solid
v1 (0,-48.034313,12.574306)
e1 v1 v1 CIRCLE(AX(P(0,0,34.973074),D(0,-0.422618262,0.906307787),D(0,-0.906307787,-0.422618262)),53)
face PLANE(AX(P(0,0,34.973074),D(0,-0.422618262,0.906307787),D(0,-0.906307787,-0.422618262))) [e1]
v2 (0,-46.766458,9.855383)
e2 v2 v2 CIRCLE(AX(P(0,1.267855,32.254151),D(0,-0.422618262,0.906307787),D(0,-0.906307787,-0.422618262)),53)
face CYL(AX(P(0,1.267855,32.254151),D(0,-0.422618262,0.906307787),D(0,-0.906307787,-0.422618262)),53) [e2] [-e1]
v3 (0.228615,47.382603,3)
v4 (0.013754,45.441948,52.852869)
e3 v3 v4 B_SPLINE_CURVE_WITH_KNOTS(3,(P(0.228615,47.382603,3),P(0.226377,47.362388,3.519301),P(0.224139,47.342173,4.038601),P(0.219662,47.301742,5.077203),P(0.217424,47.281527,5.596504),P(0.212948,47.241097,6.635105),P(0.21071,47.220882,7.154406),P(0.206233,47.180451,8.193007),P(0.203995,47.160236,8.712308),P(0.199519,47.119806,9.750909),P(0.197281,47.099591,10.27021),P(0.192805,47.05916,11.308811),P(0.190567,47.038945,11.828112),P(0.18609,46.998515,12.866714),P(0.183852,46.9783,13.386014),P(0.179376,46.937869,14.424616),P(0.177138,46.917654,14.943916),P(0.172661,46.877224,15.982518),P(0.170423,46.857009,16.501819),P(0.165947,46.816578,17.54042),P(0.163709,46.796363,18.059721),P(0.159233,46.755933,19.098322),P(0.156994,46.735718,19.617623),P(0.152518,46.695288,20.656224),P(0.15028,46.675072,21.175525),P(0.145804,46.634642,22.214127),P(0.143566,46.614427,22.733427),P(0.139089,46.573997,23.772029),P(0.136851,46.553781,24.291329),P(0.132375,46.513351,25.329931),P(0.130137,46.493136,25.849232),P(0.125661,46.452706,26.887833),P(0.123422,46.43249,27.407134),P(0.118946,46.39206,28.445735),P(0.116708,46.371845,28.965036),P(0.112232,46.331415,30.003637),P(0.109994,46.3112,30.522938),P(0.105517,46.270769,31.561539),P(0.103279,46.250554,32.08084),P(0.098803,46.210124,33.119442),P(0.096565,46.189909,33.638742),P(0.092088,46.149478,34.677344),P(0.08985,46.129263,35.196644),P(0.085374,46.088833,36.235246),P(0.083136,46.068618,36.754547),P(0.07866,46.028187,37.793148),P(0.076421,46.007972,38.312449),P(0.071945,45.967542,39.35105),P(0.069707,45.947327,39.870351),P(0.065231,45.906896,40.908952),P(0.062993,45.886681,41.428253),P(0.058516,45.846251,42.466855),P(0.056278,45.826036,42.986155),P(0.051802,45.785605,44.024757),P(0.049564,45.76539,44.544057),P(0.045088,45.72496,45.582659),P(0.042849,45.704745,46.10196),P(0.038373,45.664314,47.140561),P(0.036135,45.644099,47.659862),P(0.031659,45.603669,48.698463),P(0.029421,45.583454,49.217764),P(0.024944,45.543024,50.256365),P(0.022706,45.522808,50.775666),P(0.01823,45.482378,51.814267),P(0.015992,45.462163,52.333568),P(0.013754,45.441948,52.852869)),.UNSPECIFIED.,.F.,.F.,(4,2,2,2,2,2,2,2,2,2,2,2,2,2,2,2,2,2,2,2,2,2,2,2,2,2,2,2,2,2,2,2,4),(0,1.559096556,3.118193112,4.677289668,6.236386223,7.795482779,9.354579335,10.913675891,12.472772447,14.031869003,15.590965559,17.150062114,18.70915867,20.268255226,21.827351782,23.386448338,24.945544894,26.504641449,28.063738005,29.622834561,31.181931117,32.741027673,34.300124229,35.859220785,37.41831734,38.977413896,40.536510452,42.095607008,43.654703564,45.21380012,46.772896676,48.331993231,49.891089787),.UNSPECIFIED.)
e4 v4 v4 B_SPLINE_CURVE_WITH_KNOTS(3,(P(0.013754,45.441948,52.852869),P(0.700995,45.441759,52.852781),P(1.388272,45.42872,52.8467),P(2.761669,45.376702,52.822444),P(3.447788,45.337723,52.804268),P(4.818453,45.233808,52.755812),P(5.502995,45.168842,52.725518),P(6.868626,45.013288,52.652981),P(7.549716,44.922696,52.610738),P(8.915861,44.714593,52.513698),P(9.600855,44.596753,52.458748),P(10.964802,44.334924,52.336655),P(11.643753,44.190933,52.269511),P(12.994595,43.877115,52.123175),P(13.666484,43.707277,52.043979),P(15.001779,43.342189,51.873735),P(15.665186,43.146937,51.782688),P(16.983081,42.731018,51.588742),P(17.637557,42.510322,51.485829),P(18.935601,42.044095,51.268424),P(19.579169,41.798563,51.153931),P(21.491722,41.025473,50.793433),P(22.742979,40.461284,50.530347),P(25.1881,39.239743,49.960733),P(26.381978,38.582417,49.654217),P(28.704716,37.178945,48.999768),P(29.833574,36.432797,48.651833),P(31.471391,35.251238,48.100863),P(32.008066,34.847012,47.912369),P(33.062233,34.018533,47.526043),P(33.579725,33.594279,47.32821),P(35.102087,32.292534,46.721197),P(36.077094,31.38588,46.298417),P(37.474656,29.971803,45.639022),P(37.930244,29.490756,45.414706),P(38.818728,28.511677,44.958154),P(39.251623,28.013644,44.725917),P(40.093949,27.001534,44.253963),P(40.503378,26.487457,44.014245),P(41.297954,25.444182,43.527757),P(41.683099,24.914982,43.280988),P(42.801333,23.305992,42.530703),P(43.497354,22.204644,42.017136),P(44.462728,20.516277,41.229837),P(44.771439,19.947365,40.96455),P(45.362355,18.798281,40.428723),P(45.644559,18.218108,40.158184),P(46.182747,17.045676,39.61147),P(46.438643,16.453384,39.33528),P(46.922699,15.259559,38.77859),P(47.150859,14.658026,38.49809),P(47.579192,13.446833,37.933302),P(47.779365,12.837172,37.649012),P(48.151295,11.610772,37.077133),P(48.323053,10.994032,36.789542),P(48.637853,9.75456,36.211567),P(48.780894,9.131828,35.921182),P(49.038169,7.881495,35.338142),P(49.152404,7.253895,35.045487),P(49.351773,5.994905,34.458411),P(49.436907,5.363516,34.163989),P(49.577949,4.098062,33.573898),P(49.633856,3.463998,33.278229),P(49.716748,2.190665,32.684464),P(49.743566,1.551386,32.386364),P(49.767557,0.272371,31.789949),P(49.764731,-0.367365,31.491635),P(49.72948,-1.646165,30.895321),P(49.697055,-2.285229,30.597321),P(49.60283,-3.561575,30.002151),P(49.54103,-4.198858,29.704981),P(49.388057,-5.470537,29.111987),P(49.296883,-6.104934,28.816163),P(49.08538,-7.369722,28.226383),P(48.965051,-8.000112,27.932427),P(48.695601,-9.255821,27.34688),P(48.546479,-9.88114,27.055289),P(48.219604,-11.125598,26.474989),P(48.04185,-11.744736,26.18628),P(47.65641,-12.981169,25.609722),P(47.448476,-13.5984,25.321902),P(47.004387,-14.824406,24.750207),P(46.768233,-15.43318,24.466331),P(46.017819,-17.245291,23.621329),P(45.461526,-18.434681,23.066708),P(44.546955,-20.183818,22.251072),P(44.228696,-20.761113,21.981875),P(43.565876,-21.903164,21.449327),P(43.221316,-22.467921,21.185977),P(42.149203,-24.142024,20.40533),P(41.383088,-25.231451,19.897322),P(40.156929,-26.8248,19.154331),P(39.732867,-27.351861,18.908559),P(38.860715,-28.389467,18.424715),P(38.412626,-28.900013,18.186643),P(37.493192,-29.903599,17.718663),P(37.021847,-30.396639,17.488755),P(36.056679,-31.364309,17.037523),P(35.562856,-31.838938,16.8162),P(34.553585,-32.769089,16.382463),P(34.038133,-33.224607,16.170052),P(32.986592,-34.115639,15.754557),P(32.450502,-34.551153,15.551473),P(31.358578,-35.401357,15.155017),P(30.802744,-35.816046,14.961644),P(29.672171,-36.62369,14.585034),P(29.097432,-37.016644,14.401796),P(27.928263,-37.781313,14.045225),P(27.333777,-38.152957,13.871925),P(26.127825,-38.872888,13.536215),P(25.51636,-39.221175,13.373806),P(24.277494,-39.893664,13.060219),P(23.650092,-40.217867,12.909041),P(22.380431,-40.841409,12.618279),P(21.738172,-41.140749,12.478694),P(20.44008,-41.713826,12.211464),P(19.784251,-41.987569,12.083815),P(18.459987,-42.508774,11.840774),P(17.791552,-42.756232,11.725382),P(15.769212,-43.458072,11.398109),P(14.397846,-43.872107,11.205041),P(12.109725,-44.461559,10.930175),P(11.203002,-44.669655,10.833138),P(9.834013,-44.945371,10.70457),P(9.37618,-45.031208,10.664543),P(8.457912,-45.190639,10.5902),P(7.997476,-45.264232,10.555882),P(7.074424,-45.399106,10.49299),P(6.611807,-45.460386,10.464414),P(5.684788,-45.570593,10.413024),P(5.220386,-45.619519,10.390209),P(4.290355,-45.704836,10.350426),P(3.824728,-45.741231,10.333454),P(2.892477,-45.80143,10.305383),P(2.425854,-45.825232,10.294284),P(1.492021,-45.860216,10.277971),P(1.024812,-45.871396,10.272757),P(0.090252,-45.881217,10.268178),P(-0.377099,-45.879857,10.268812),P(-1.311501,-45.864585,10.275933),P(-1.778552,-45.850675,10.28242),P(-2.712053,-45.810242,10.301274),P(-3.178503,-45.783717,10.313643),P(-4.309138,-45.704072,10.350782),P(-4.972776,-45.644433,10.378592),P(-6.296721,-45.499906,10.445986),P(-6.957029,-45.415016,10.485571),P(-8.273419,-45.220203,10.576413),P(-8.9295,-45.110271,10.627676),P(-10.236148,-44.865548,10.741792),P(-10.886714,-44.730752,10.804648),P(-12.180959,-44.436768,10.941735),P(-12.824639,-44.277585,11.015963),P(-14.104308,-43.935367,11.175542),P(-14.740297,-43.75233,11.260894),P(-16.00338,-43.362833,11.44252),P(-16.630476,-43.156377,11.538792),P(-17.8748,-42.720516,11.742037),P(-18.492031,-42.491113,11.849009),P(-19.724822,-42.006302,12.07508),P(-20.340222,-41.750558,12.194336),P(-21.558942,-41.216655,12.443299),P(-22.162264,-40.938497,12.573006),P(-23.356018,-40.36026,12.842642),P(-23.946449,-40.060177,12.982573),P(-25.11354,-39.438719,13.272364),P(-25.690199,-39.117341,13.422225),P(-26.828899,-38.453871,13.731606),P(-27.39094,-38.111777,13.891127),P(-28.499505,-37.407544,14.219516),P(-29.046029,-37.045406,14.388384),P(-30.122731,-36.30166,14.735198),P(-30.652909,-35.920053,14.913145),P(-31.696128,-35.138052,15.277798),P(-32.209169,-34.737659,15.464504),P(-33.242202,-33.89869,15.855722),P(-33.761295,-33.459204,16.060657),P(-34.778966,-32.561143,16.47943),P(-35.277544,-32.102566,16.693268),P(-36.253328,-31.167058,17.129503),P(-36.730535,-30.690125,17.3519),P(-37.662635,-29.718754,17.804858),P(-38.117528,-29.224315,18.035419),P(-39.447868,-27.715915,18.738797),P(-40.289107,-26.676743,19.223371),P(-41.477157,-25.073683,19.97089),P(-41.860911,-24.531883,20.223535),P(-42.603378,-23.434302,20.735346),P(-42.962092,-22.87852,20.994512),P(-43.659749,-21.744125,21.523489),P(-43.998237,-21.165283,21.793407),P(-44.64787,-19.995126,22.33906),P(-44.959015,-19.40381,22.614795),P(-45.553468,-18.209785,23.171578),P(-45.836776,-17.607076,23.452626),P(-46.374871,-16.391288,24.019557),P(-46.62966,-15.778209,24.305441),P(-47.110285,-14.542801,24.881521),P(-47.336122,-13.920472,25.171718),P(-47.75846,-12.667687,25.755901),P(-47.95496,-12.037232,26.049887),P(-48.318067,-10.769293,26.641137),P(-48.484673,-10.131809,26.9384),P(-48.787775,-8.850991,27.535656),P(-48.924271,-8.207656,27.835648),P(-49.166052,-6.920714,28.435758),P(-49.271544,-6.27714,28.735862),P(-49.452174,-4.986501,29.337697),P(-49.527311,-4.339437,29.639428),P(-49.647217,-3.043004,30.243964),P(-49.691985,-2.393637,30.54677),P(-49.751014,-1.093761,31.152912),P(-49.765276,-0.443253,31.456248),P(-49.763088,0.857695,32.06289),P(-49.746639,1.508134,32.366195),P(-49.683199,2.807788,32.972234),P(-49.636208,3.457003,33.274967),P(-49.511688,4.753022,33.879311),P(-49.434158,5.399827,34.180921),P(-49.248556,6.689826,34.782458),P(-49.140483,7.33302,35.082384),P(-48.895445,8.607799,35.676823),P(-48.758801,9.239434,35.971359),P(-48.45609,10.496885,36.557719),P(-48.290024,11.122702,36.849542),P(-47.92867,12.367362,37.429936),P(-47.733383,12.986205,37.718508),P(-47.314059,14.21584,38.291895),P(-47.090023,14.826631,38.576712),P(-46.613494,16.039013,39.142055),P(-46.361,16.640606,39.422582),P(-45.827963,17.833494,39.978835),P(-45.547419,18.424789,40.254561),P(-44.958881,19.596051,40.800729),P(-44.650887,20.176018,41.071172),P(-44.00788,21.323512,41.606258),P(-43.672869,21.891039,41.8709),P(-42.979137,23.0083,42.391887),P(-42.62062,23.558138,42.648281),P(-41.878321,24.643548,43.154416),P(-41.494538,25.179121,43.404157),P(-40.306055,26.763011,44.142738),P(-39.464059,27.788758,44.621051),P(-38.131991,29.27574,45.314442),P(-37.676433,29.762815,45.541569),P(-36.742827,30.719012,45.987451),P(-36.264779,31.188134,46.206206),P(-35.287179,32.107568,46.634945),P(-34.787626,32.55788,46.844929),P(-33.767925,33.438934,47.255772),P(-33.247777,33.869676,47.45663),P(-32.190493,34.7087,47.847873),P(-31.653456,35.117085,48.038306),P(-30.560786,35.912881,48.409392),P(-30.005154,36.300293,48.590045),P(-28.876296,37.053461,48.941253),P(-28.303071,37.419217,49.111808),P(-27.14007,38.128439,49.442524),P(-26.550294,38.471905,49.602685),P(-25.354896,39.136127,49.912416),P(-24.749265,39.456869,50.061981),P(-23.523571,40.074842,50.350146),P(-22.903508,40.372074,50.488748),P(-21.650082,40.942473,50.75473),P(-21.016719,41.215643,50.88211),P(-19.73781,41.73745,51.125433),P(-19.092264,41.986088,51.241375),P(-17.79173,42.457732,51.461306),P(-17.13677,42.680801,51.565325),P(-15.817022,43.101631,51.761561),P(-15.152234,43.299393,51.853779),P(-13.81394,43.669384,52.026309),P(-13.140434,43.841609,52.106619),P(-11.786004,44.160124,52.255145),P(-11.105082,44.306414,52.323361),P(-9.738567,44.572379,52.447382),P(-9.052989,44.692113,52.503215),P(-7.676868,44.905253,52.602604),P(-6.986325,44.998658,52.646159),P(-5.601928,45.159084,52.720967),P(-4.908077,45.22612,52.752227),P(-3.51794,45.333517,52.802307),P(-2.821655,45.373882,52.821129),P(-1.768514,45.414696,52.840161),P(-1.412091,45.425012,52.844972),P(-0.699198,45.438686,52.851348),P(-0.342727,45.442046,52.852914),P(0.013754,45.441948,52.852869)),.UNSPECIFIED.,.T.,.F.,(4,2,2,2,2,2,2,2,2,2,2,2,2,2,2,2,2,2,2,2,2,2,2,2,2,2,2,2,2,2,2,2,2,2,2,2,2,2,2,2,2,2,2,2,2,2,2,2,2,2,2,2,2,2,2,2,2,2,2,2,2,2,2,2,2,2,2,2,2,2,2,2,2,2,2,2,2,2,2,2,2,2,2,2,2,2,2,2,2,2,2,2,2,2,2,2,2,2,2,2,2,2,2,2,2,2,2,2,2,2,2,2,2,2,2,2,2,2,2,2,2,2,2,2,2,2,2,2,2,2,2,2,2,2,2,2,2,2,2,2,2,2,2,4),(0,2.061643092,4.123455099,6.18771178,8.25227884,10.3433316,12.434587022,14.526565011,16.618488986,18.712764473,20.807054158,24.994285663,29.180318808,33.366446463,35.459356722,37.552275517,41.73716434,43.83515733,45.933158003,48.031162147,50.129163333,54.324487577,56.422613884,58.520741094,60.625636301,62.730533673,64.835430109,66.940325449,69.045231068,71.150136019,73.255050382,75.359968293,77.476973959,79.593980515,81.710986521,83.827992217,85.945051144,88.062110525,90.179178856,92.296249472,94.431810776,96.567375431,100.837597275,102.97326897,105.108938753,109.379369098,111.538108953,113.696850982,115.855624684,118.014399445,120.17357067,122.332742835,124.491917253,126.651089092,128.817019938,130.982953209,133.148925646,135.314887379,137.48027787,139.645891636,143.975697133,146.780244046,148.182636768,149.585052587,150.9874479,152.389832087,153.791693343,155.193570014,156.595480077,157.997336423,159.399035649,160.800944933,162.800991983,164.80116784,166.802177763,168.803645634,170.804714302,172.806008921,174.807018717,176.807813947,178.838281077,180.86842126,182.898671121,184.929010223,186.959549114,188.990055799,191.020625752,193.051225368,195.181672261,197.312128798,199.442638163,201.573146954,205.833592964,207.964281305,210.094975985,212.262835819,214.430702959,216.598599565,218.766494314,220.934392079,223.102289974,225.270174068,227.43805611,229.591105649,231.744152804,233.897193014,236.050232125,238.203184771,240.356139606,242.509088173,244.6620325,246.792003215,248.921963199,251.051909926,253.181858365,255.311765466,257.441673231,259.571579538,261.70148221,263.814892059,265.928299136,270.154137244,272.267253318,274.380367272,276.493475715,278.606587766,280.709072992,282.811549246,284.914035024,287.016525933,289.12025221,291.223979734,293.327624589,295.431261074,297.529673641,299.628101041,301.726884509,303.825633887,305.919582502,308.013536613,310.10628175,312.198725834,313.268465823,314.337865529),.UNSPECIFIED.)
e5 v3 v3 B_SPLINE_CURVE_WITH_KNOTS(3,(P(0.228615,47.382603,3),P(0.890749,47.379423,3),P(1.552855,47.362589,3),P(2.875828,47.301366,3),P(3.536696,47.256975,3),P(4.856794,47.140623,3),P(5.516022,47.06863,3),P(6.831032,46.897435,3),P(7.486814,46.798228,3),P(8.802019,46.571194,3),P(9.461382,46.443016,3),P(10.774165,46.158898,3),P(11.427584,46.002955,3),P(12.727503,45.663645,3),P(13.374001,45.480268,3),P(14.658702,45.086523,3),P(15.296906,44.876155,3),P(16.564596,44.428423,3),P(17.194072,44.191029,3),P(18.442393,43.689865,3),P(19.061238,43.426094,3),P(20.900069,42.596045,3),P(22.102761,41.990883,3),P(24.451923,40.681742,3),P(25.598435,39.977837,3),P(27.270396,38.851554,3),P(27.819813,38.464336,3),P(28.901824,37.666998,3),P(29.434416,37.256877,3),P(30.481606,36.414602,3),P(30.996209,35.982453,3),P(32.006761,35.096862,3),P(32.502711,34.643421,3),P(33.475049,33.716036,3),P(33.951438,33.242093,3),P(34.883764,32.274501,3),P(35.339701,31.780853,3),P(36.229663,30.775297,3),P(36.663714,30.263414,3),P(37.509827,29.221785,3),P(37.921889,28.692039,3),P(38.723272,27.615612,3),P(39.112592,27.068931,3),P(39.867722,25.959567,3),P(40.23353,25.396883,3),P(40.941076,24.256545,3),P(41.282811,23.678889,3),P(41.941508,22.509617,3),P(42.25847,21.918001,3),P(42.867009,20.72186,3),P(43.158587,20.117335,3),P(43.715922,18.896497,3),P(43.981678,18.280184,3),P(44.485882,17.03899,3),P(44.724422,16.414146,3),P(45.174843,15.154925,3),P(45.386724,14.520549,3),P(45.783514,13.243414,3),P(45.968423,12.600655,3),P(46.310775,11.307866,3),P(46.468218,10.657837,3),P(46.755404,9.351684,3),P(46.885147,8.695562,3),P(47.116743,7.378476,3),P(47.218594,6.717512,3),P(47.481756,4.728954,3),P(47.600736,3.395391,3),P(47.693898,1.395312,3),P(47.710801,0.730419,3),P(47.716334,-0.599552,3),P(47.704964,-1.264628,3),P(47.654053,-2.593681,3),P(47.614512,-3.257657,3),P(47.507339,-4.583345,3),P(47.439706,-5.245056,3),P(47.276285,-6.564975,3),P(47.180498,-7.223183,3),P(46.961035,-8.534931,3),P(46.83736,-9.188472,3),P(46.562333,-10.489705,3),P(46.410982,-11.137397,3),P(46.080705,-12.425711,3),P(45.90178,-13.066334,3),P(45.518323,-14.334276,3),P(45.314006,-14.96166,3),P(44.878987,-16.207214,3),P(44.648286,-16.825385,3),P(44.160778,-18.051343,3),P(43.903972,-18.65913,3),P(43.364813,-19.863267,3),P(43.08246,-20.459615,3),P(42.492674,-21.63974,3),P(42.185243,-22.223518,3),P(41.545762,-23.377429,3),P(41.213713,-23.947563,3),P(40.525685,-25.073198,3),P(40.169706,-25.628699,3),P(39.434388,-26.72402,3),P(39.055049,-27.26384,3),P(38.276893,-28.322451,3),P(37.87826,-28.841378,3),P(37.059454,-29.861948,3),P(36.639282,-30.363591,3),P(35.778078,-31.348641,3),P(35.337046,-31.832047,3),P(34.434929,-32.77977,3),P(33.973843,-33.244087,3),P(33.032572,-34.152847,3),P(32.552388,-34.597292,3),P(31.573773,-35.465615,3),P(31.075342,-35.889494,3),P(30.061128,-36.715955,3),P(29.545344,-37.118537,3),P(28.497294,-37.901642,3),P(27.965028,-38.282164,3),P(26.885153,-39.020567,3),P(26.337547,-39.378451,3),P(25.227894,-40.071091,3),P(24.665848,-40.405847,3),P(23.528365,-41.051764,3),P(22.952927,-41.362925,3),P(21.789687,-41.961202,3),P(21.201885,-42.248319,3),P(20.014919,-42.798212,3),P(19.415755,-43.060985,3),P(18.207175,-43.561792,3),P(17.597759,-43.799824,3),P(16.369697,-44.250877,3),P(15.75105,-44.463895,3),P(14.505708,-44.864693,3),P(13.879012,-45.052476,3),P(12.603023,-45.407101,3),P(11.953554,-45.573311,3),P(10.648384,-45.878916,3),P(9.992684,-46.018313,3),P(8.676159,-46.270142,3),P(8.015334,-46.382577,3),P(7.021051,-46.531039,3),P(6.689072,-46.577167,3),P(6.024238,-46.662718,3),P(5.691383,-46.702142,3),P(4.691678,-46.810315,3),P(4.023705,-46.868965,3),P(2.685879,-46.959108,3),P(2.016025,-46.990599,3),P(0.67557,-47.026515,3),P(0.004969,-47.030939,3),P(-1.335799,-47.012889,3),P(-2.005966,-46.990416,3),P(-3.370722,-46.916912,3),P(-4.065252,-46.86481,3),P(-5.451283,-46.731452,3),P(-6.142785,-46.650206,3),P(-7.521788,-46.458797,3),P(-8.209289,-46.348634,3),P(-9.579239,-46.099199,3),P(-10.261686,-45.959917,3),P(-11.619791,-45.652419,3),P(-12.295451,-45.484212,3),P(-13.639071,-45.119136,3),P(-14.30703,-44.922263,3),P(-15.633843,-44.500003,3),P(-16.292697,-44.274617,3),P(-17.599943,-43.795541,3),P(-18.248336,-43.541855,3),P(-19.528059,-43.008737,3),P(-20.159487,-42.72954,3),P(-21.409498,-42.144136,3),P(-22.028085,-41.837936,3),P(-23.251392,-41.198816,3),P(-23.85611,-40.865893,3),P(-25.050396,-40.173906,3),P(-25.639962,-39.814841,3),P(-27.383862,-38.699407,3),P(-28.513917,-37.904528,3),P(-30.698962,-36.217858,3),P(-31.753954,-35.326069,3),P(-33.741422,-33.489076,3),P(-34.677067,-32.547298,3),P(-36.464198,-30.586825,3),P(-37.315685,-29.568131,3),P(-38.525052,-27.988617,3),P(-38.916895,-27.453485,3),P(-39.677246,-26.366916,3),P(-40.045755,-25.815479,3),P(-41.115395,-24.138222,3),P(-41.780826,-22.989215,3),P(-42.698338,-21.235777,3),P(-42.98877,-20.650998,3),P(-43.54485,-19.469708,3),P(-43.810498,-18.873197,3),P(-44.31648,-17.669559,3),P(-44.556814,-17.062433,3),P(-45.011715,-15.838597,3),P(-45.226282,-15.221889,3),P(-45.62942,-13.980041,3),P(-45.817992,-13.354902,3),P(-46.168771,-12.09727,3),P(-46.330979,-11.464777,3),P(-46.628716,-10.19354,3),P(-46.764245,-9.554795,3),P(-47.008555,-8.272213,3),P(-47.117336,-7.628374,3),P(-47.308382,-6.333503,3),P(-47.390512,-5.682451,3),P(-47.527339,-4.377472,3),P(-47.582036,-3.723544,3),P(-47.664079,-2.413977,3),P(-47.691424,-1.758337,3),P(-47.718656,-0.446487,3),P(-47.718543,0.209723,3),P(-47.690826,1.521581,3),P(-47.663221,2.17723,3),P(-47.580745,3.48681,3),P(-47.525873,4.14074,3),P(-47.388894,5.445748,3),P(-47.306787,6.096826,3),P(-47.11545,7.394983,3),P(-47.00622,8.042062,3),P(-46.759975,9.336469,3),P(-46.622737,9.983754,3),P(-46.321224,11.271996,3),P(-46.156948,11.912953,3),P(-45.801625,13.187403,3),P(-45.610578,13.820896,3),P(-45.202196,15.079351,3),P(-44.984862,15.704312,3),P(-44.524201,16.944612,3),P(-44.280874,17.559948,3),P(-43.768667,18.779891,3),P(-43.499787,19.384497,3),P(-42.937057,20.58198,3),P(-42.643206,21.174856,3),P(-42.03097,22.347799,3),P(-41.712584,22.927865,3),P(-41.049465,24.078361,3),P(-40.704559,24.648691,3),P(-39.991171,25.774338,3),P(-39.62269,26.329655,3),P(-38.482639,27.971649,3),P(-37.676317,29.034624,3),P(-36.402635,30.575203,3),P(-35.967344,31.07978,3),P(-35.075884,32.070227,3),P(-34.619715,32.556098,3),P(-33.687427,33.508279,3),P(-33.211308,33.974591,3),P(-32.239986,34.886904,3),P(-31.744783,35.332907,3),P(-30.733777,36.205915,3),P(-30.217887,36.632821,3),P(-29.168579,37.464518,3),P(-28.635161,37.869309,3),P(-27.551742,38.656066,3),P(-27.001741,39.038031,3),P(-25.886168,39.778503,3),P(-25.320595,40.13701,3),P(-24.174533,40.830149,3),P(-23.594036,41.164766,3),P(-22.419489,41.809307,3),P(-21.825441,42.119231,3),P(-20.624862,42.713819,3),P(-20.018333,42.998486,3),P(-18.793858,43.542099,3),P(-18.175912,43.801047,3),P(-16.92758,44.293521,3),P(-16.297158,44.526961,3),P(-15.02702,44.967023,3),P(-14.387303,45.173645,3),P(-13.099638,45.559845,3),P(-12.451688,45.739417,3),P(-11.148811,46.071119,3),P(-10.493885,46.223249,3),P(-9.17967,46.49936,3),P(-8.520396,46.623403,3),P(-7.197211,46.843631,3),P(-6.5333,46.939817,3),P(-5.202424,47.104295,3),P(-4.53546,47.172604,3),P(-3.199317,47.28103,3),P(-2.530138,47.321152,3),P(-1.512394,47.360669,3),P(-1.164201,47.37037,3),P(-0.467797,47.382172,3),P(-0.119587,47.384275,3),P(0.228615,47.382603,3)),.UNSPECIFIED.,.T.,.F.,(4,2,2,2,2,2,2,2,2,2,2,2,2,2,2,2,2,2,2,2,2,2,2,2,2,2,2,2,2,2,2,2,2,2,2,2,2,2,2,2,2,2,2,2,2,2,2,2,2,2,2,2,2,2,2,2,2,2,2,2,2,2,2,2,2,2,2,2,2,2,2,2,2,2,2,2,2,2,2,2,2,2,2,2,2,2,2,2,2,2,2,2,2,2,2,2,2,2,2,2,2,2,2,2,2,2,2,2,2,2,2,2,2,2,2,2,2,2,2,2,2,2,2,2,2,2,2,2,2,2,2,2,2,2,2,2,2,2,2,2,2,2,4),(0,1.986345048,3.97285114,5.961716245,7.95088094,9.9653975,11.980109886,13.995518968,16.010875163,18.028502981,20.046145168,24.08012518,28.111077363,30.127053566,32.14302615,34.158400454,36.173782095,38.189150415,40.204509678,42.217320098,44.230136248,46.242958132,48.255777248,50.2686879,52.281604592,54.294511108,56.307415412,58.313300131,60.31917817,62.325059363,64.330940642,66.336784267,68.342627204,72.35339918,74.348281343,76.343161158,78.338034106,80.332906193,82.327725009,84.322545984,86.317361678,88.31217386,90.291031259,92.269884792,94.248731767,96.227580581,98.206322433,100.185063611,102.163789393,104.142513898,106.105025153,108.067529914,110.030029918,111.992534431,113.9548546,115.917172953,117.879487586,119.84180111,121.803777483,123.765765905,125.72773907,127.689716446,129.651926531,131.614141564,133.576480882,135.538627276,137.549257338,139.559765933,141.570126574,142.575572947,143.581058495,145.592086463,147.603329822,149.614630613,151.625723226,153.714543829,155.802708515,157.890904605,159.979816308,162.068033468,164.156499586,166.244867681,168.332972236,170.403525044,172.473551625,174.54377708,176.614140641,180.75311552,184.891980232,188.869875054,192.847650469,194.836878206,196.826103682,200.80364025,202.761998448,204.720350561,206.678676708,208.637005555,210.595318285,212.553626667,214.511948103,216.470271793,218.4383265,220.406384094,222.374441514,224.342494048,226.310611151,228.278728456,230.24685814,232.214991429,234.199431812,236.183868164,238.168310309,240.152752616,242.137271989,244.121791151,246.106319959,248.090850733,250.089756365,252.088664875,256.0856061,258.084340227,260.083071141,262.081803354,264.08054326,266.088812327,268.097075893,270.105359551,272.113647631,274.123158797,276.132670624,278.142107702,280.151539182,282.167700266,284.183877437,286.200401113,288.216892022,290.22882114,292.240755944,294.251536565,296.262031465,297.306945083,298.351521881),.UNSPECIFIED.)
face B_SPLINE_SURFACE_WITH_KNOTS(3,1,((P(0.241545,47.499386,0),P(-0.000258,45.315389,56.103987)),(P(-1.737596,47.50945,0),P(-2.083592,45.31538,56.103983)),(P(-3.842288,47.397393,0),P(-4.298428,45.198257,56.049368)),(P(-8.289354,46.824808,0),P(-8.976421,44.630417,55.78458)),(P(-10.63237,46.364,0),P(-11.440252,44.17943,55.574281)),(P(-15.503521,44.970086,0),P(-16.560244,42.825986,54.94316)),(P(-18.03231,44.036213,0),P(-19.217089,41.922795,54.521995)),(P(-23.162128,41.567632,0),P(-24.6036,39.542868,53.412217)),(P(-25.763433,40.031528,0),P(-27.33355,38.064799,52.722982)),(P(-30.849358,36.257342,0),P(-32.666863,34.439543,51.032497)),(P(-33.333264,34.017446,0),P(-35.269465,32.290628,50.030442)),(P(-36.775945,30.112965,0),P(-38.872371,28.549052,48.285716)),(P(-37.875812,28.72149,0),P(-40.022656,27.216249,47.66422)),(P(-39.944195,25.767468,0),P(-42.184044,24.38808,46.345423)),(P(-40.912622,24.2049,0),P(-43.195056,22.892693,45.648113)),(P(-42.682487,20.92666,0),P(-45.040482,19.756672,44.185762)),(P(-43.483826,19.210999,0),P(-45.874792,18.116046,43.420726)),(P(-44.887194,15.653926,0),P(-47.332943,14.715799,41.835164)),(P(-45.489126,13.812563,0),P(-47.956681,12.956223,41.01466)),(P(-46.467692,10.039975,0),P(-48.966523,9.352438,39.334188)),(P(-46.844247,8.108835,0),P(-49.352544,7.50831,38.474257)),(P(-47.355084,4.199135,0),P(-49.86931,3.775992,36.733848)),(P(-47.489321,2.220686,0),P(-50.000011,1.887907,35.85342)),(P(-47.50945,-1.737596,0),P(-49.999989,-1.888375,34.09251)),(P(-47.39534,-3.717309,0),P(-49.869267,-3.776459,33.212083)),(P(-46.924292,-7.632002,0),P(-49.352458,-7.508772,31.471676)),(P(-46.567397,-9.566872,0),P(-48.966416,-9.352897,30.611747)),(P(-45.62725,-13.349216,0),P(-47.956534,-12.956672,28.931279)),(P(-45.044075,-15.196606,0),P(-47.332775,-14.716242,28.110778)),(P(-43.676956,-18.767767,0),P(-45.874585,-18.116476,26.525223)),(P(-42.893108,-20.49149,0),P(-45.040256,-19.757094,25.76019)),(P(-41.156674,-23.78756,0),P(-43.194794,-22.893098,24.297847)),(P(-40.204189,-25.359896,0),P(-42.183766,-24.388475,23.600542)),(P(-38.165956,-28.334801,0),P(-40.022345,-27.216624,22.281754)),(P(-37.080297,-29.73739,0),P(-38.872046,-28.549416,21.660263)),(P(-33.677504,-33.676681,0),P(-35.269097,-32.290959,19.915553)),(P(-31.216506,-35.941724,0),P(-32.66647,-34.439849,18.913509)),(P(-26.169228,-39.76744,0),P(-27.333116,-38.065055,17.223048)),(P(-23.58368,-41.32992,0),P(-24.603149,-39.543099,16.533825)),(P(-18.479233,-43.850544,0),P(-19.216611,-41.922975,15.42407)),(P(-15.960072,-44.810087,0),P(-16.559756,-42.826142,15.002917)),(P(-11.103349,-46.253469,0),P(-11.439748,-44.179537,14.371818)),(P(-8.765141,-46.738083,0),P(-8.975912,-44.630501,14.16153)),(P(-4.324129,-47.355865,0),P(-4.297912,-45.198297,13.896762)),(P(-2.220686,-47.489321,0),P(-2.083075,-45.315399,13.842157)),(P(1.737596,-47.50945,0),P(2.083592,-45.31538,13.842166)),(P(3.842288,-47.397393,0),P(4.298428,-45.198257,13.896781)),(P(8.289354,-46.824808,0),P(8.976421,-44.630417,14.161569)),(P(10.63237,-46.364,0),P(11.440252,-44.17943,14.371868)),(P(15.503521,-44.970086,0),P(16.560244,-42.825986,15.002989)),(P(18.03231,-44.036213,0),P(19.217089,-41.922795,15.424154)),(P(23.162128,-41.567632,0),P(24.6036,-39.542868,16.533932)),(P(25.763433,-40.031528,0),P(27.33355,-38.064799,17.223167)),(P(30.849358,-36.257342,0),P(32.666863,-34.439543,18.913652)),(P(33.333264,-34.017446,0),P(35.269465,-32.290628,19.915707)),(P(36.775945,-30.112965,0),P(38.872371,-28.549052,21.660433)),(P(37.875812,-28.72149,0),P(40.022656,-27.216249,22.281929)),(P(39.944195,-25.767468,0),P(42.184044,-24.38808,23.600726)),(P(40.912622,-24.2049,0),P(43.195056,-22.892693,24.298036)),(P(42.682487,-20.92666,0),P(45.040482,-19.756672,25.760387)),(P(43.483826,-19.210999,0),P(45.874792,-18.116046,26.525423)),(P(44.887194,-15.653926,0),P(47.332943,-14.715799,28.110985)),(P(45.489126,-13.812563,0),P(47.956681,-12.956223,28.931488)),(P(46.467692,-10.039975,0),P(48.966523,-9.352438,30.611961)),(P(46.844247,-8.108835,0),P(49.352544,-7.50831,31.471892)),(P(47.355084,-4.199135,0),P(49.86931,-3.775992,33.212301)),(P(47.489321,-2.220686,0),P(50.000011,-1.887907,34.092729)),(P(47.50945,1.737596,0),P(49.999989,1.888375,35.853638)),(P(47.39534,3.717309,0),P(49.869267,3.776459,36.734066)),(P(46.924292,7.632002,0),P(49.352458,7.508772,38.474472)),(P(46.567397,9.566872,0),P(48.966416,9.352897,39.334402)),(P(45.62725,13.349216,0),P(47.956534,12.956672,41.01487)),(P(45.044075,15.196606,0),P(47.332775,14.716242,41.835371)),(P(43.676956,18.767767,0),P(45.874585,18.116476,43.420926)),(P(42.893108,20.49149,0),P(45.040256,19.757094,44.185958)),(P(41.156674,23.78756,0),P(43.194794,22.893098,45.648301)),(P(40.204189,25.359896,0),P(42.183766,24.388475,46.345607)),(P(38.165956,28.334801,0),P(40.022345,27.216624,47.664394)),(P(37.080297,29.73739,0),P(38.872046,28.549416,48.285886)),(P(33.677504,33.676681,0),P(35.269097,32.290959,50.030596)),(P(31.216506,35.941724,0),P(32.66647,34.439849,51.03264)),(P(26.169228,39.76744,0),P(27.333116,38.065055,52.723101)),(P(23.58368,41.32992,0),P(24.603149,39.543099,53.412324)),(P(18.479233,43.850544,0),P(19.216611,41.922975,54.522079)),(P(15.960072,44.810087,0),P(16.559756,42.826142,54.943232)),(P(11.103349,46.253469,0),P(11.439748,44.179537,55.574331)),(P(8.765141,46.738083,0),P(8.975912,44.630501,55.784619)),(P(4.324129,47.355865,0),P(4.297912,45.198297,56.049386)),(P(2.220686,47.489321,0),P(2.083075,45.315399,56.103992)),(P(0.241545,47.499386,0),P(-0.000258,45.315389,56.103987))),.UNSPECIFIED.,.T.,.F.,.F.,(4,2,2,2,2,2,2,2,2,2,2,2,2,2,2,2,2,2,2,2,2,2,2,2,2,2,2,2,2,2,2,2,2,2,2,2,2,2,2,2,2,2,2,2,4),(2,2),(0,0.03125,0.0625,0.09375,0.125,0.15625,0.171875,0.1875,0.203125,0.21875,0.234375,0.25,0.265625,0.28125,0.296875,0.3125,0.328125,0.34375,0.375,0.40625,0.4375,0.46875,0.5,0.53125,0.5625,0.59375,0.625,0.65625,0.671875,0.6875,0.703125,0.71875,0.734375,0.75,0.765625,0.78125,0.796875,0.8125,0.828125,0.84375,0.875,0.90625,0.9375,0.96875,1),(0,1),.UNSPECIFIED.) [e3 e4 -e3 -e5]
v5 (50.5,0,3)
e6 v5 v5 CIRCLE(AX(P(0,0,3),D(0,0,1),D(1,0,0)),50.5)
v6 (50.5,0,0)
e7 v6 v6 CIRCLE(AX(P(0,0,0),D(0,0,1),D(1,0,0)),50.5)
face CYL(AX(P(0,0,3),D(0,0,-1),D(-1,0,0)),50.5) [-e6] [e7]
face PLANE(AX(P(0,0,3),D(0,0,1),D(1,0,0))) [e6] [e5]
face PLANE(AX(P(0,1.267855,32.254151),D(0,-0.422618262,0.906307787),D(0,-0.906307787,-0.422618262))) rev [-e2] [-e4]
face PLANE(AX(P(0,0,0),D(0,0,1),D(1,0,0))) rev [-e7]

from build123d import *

# Parameters (mm, degrees)
SKETCH3_5_R         = 53
BOSS_EXTRUDE1_DEPTH = 3
SKETCH1_4_R         = 50.5
BOSS_EXTRUDE2_DEPTH = 3


with BuildPart() as part:
    # Loft1: read off the stored shape, not the designer's step
    # Loft1: loft between two sections, ruled curve by curve
    loft1_from = [
        Edge.make_bspline([(0.241544596, 47.499385851, 0), (-1.737596481, 47.509450209, 0), (-3.842288399, 47.39739319, 0), (-8.289353956, 46.8248083, 0), (-10.632369605, 46.363999982, 0), (-15.503520848, 44.970085825, 0), (-18.032309665, 44.036212824, 0), (-23.162128099, 41.567632284, 0), (-25.763433471, 40.031528494, 0), (-30.849358196, 36.257342383, 0), (-33.333264415, 34.017445551, 0), (-36.775944803, 30.112965039, 0), (-37.87581218, 28.721489593, 0), (-39.944194911, 25.767467971, 0), (-40.912622225, 24.204899544, 0), (-42.682487304, 20.926659955, 0), (-43.4838255, 19.210998711, 0), (-44.887193549, 15.653926246, 0), (-45.489126325, 13.81256268, 0), (-46.467691985, 10.039975263, 0), (-46.844246907, 8.108835207, 0), (-47.355083559, 4.19913537, 0), (-47.489321493, 2.220685673, 0), (-47.509450209, -1.737596481, 0), (-47.395340382, -3.71730908, 0), (-46.924292451, -7.632002012, 0), (-46.56739702, -9.56687182, 0), (-45.627249815, -13.349216305, 0), (-45.044075144, -15.196606398, 0), (-43.676955696, -18.767767387, 0), (-42.893107505, -20.491489645, 0), (-41.156674204, -23.787559516, 0), (-40.204188557, -25.359896199, 0), (-38.165955692, -28.334800844, 0), (-37.080296735, -29.737390161, 0), (-33.677503614, -33.676681379, 0), (-31.216505982, -35.941724111, 0), (-26.169228392, -39.767439736, 0), (-23.583679985, -41.329919793, 0), (-18.47923273, -43.850543776, 0), (-15.96007234, -44.810086685, 0), (-11.103349361, -46.253469175, 0), (-8.765141384, -46.738082523, 0), (-4.324129102, -47.3558652, 0), (-2.220685673, -47.489321493, 0), (1.737596481, -47.509450209, 0), (3.842288399, -47.39739319, 0), (8.289353956, -46.8248083, 0), (10.632369605, -46.363999982, 0), (15.503520848, -44.970085825, 0), (18.032309665, -44.036212824, 0), (23.162128099, -41.567632284, 0), (25.763433471, -40.031528494, 0), (30.849358196, -36.257342383, 0), (33.333264415, -34.017445551, 0), (36.775944803, -30.112965039, 0), (37.87581218, -28.721489593, 0), (39.944194911, -25.767467971, 0), (40.912622225, -24.204899544, 0), (42.682487304, -20.926659955, 0), (43.4838255, -19.210998711, 0), (44.887193549, -15.653926246, 0), (45.489126325, -13.81256268, 0), (46.467691985, -10.039975263, 0), (46.844246907, -8.108835207, 0), (47.355083559, -4.19913537, 0), (47.489321493, -2.220685673, 0), (47.509450209, 1.737596481, 0), (47.395340382, 3.71730908, 0), (46.924292451, 7.632002012, 0), (46.56739702, 9.56687182, 0), (45.627249815, 13.349216305, 0), (45.044075144, 15.196606398, 0), (43.676955696, 18.767767387, 0), (42.893107505, 20.491489645, 0), (41.156674204, 23.787559516, 0), (40.204188557, 25.359896199, 0), (38.165955692, 28.334800844, 0), (37.080296735, 29.737390161, 0), (33.677503614, 33.676681379, 0), (31.216505982, 35.941724111, 0), (26.169228392, 39.767439736, 0), (23.583679985, 41.329919793, 0), (18.47923273, 43.850543776, 0), (15.96007234, 44.810086685, 0), (11.103349361, 46.253469175, 0), (8.765141384, 46.738082523, 0), (4.324129102, 47.3558652, 0), (2.220685673, 47.489321493, 0), (0.241544596, 47.499385851, 0)], [0, 0, 0, 0, 0.03125, 0.03125, 0.0625, 0.0625, 0.09375, 0.09375, 0.125, 0.125, 0.15625, 0.15625, 0.171875, 0.171875, 0.1875, 0.1875, 0.203125, 0.203125, 0.21875, 0.21875, 0.234375, 0.234375, 0.25, 0.25, 0.265625, 0.265625, 0.28125, 0.28125, 0.296875, 0.296875, 0.3125, 0.3125, 0.328125, 0.328125, 0.34375, 0.34375, 0.375, 0.375, 0.40625, 0.40625, 0.4375, 0.4375, 0.46875, 0.46875, 0.5, 0.5, 0.53125, 0.53125, 0.5625, 0.5625, 0.59375, 0.59375, 0.625, 0.625, 0.65625, 0.65625, 0.671875, 0.671875, 0.6875, 0.6875, 0.703125, 0.703125, 0.71875, 0.71875, 0.734375, 0.734375, 0.75, 0.75, 0.765625, 0.765625, 0.78125, 0.78125, 0.796875, 0.796875, 0.8125, 0.8125, 0.828125, 0.828125, 0.84375, 0.84375, 0.875, 0.875, 0.90625, 0.90625, 0.9375, 0.9375, 0.96875, 0.96875, 1, 1, 1, 1], 3),
    ]
    loft1_to = [
        Edge.make_bspline([(-0.000258413, 45.315389351, 56.103987448), (-2.083591746, 45.315379593, 56.103982898), (-4.298427792, 45.198256849, 56.049367665), (-8.976420743, 44.630417387, 55.784579776), (-11.440251935, 44.179430006, 55.574280906), (-16.560244217, 42.825986395, 54.943159786), (-19.217088791, 41.922795124, 54.521994779), (-24.60360049, 39.542868117, 53.41221659), (-27.3335504, 38.064799025, 52.722981653), (-32.66686306, 34.439542895, 51.032496957), (-35.26946543, 32.290628285, 50.030441618), (-38.872371472, 28.54905177, 48.285715835), (-40.022655762, 27.216248807, 47.664219607), (-42.184044209, 24.388079988, 46.345422828), (-43.195055576, 22.892693332, 45.648112578), (-45.040481753, 19.756671584, 44.185761621), (-45.874791809, 18.116046437, 43.420725551), (-47.332942587, 14.715799072, 41.835164165), (-47.956681379, 12.956222787, 41.014660268), (-48.966522761, 9.35243798, 39.334187814), (-49.352543738, 7.508309779, 38.474256711), (-49.869310496, 3.775991683, 36.7338482), (-50.000010767, 1.887907021, 35.853419864), (-49.999989232, -1.888375425, 34.09251044), (-49.869267427, -3.776458861, 33.212082674), (-49.352458103, -7.508772116, 31.47167642), (-48.966416093, -9.352896701, 30.611747004), (-47.95653361, -12.956672047, 28.931278962), (-47.332774749, -14.716242489, 28.11077779), (-45.874585192, -18.116476194, 26.525222773), (-45.040256424, -19.757093525, 25.760190348), (-43.194794481, -22.893097985, 24.297847452), (-42.183766059, -24.388475169, 23.60054162), (-40.022345356, -27.21662374, 22.281754282), (-38.872045866, -28.549415928, 21.660263079), (-35.269097151, -32.29095869, 19.915553035), (-32.666470272, -34.439848919, 18.913509065), (-27.333116266, -38.065055085, 17.223047667), (-24.603149499, -39.543098603, 16.533824656), (-19.216610657, -41.922975149, 15.424069997), (-16.559755782, -42.82614153, 15.002916597), (-11.439748065, -44.179537177, 14.371817842), (-8.975911729, -44.630501476, 14.161529736), (-4.297912302, -45.198297114, 13.896762282), (-2.08307492, -45.31539911, 13.842156724), (2.083591746, -45.315379593, 13.842165825), (4.298427792, -45.198256849, 13.896781058), (8.976420743, -44.630417387, 14.161568947), (11.440251935, -44.179430006, 14.371867817), (16.560244217, -42.825986395, 15.002988937), (19.217088791, -41.922795124, 15.424153944), (24.60360049, -39.542868117, 16.533932133), (27.3335504, -38.064799025, 17.22316707), (32.66686306, -34.439542895, 18.913651766), (35.26946543, -32.290628285, 19.915707106), (38.872371472, -28.54905177, 21.660432888), (40.022655762, -27.216248807, 22.281929117), (42.184044209, -24.388079988, 23.600725896), (43.195055576, -22.892693332, 24.298036145), (45.040481753, -19.756671584, 25.760387102), (45.874791809, -18.116046437, 26.525423172), (47.332942587, -14.715799072, 28.110984559), (47.956681379, -12.956222787, 28.931488455), (48.966522761, -9.35243798, 30.611960909), (49.352543738, -7.508309779, 31.471892012), (49.869310496, -3.775991683, 33.212300523), (50.000010767, -1.887907021, 34.09272886), (49.999989232, 1.888375425, 35.853638284), (49.869267427, 3.776458861, 36.734066049), (49.352458103, 7.508772116, 38.474472303), (48.966416093, 9.352896701, 39.334401719), (47.95653361, 12.956672047, 41.014869761), (47.332774749, 14.716242489, 41.835370933), (45.874585192, 18.116476194, 43.42092595), (45.040256424, 19.757093525, 44.185958375), (43.194794481, 22.893097985, 45.648301271), (42.183766059, 24.388475169, 46.345607104), (40.022345356, 27.21662374, 47.664394441), (38.872045866, 28.549415928, 48.285885645), (35.269097151, 32.29095869, 50.030595688), (32.666470272, 34.439848919, 51.032639658), (27.333116266, 38.065055085, 52.723101056), (24.603149499, 39.543098603, 53.412324067), (19.216610657, 41.922975149, 54.522078726), (16.559755782, 42.82614153, 54.943232126), (11.439748065, 44.179537177, 55.574330881), (8.975911729, 44.630501476, 55.784618987), (4.297912302, 45.198297114, 56.049386442), (2.08307492, 45.31539911, 56.103991999), (-0.000258413, 45.315389351, 56.103987448)], [0, 0, 0, 0, 0.03125, 0.03125, 0.0625, 0.0625, 0.09375, 0.09375, 0.125, 0.125, 0.15625, 0.15625, 0.171875, 0.171875, 0.1875, 0.1875, 0.203125, 0.203125, 0.21875, 0.21875, 0.234375, 0.234375, 0.25, 0.25, 0.265625, 0.265625, 0.28125, 0.28125, 0.296875, 0.296875, 0.3125, 0.3125, 0.328125, 0.328125, 0.34375, 0.34375, 0.375, 0.375, 0.40625, 0.40625, 0.4375, 0.4375, 0.46875, 0.46875, 0.5, 0.5, 0.53125, 0.53125, 0.5625, 0.5625, 0.59375, 0.59375, 0.625, 0.625, 0.65625, 0.65625, 0.671875, 0.671875, 0.6875, 0.6875, 0.703125, 0.703125, 0.71875, 0.71875, 0.734375, 0.734375, 0.75, 0.75, 0.765625, 0.765625, 0.78125, 0.78125, 0.796875, 0.796875, 0.8125, 0.8125, 0.828125, 0.828125, 0.84375, 0.84375, 0.875, 0.875, 0.90625, 0.90625, 0.9375, 0.9375, 0.96875, 0.96875, 1, 1, 1, 1], 3),
    ]
    loft1 = Solid(Shell([*[Face.make_surface_from_curves(loft1_from[k], loft1_to[k]) for k in range(1)], Face(Wire(loft1_from)), Face(Wire(loft1_to))]))
    add(loft1)

    # Sketch3<5> → Boss-Extrude1 (add)
    with BuildSketch(Plane(origin=(0, -13.395464637, 28.726666617), x_dir=(1, 0, 0), z_dir=(0, -0.4226182617407003, 0.9063077870366496))):
        with Locations(Location((0, 14.780259894, 0), (0, 0, 270))):
            Circle(SKETCH3_5_R)
    extrude(amount=-BOSS_EXTRUDE1_DEPTH)

    # Sketch1<4> → Boss-Extrude2 (add)
    with BuildSketch(Plane.XY):
        Circle(SKETCH1_4_R)
    extrude(amount=BOSS_EXTRUDE2_DEPTH)


solid = part.part
